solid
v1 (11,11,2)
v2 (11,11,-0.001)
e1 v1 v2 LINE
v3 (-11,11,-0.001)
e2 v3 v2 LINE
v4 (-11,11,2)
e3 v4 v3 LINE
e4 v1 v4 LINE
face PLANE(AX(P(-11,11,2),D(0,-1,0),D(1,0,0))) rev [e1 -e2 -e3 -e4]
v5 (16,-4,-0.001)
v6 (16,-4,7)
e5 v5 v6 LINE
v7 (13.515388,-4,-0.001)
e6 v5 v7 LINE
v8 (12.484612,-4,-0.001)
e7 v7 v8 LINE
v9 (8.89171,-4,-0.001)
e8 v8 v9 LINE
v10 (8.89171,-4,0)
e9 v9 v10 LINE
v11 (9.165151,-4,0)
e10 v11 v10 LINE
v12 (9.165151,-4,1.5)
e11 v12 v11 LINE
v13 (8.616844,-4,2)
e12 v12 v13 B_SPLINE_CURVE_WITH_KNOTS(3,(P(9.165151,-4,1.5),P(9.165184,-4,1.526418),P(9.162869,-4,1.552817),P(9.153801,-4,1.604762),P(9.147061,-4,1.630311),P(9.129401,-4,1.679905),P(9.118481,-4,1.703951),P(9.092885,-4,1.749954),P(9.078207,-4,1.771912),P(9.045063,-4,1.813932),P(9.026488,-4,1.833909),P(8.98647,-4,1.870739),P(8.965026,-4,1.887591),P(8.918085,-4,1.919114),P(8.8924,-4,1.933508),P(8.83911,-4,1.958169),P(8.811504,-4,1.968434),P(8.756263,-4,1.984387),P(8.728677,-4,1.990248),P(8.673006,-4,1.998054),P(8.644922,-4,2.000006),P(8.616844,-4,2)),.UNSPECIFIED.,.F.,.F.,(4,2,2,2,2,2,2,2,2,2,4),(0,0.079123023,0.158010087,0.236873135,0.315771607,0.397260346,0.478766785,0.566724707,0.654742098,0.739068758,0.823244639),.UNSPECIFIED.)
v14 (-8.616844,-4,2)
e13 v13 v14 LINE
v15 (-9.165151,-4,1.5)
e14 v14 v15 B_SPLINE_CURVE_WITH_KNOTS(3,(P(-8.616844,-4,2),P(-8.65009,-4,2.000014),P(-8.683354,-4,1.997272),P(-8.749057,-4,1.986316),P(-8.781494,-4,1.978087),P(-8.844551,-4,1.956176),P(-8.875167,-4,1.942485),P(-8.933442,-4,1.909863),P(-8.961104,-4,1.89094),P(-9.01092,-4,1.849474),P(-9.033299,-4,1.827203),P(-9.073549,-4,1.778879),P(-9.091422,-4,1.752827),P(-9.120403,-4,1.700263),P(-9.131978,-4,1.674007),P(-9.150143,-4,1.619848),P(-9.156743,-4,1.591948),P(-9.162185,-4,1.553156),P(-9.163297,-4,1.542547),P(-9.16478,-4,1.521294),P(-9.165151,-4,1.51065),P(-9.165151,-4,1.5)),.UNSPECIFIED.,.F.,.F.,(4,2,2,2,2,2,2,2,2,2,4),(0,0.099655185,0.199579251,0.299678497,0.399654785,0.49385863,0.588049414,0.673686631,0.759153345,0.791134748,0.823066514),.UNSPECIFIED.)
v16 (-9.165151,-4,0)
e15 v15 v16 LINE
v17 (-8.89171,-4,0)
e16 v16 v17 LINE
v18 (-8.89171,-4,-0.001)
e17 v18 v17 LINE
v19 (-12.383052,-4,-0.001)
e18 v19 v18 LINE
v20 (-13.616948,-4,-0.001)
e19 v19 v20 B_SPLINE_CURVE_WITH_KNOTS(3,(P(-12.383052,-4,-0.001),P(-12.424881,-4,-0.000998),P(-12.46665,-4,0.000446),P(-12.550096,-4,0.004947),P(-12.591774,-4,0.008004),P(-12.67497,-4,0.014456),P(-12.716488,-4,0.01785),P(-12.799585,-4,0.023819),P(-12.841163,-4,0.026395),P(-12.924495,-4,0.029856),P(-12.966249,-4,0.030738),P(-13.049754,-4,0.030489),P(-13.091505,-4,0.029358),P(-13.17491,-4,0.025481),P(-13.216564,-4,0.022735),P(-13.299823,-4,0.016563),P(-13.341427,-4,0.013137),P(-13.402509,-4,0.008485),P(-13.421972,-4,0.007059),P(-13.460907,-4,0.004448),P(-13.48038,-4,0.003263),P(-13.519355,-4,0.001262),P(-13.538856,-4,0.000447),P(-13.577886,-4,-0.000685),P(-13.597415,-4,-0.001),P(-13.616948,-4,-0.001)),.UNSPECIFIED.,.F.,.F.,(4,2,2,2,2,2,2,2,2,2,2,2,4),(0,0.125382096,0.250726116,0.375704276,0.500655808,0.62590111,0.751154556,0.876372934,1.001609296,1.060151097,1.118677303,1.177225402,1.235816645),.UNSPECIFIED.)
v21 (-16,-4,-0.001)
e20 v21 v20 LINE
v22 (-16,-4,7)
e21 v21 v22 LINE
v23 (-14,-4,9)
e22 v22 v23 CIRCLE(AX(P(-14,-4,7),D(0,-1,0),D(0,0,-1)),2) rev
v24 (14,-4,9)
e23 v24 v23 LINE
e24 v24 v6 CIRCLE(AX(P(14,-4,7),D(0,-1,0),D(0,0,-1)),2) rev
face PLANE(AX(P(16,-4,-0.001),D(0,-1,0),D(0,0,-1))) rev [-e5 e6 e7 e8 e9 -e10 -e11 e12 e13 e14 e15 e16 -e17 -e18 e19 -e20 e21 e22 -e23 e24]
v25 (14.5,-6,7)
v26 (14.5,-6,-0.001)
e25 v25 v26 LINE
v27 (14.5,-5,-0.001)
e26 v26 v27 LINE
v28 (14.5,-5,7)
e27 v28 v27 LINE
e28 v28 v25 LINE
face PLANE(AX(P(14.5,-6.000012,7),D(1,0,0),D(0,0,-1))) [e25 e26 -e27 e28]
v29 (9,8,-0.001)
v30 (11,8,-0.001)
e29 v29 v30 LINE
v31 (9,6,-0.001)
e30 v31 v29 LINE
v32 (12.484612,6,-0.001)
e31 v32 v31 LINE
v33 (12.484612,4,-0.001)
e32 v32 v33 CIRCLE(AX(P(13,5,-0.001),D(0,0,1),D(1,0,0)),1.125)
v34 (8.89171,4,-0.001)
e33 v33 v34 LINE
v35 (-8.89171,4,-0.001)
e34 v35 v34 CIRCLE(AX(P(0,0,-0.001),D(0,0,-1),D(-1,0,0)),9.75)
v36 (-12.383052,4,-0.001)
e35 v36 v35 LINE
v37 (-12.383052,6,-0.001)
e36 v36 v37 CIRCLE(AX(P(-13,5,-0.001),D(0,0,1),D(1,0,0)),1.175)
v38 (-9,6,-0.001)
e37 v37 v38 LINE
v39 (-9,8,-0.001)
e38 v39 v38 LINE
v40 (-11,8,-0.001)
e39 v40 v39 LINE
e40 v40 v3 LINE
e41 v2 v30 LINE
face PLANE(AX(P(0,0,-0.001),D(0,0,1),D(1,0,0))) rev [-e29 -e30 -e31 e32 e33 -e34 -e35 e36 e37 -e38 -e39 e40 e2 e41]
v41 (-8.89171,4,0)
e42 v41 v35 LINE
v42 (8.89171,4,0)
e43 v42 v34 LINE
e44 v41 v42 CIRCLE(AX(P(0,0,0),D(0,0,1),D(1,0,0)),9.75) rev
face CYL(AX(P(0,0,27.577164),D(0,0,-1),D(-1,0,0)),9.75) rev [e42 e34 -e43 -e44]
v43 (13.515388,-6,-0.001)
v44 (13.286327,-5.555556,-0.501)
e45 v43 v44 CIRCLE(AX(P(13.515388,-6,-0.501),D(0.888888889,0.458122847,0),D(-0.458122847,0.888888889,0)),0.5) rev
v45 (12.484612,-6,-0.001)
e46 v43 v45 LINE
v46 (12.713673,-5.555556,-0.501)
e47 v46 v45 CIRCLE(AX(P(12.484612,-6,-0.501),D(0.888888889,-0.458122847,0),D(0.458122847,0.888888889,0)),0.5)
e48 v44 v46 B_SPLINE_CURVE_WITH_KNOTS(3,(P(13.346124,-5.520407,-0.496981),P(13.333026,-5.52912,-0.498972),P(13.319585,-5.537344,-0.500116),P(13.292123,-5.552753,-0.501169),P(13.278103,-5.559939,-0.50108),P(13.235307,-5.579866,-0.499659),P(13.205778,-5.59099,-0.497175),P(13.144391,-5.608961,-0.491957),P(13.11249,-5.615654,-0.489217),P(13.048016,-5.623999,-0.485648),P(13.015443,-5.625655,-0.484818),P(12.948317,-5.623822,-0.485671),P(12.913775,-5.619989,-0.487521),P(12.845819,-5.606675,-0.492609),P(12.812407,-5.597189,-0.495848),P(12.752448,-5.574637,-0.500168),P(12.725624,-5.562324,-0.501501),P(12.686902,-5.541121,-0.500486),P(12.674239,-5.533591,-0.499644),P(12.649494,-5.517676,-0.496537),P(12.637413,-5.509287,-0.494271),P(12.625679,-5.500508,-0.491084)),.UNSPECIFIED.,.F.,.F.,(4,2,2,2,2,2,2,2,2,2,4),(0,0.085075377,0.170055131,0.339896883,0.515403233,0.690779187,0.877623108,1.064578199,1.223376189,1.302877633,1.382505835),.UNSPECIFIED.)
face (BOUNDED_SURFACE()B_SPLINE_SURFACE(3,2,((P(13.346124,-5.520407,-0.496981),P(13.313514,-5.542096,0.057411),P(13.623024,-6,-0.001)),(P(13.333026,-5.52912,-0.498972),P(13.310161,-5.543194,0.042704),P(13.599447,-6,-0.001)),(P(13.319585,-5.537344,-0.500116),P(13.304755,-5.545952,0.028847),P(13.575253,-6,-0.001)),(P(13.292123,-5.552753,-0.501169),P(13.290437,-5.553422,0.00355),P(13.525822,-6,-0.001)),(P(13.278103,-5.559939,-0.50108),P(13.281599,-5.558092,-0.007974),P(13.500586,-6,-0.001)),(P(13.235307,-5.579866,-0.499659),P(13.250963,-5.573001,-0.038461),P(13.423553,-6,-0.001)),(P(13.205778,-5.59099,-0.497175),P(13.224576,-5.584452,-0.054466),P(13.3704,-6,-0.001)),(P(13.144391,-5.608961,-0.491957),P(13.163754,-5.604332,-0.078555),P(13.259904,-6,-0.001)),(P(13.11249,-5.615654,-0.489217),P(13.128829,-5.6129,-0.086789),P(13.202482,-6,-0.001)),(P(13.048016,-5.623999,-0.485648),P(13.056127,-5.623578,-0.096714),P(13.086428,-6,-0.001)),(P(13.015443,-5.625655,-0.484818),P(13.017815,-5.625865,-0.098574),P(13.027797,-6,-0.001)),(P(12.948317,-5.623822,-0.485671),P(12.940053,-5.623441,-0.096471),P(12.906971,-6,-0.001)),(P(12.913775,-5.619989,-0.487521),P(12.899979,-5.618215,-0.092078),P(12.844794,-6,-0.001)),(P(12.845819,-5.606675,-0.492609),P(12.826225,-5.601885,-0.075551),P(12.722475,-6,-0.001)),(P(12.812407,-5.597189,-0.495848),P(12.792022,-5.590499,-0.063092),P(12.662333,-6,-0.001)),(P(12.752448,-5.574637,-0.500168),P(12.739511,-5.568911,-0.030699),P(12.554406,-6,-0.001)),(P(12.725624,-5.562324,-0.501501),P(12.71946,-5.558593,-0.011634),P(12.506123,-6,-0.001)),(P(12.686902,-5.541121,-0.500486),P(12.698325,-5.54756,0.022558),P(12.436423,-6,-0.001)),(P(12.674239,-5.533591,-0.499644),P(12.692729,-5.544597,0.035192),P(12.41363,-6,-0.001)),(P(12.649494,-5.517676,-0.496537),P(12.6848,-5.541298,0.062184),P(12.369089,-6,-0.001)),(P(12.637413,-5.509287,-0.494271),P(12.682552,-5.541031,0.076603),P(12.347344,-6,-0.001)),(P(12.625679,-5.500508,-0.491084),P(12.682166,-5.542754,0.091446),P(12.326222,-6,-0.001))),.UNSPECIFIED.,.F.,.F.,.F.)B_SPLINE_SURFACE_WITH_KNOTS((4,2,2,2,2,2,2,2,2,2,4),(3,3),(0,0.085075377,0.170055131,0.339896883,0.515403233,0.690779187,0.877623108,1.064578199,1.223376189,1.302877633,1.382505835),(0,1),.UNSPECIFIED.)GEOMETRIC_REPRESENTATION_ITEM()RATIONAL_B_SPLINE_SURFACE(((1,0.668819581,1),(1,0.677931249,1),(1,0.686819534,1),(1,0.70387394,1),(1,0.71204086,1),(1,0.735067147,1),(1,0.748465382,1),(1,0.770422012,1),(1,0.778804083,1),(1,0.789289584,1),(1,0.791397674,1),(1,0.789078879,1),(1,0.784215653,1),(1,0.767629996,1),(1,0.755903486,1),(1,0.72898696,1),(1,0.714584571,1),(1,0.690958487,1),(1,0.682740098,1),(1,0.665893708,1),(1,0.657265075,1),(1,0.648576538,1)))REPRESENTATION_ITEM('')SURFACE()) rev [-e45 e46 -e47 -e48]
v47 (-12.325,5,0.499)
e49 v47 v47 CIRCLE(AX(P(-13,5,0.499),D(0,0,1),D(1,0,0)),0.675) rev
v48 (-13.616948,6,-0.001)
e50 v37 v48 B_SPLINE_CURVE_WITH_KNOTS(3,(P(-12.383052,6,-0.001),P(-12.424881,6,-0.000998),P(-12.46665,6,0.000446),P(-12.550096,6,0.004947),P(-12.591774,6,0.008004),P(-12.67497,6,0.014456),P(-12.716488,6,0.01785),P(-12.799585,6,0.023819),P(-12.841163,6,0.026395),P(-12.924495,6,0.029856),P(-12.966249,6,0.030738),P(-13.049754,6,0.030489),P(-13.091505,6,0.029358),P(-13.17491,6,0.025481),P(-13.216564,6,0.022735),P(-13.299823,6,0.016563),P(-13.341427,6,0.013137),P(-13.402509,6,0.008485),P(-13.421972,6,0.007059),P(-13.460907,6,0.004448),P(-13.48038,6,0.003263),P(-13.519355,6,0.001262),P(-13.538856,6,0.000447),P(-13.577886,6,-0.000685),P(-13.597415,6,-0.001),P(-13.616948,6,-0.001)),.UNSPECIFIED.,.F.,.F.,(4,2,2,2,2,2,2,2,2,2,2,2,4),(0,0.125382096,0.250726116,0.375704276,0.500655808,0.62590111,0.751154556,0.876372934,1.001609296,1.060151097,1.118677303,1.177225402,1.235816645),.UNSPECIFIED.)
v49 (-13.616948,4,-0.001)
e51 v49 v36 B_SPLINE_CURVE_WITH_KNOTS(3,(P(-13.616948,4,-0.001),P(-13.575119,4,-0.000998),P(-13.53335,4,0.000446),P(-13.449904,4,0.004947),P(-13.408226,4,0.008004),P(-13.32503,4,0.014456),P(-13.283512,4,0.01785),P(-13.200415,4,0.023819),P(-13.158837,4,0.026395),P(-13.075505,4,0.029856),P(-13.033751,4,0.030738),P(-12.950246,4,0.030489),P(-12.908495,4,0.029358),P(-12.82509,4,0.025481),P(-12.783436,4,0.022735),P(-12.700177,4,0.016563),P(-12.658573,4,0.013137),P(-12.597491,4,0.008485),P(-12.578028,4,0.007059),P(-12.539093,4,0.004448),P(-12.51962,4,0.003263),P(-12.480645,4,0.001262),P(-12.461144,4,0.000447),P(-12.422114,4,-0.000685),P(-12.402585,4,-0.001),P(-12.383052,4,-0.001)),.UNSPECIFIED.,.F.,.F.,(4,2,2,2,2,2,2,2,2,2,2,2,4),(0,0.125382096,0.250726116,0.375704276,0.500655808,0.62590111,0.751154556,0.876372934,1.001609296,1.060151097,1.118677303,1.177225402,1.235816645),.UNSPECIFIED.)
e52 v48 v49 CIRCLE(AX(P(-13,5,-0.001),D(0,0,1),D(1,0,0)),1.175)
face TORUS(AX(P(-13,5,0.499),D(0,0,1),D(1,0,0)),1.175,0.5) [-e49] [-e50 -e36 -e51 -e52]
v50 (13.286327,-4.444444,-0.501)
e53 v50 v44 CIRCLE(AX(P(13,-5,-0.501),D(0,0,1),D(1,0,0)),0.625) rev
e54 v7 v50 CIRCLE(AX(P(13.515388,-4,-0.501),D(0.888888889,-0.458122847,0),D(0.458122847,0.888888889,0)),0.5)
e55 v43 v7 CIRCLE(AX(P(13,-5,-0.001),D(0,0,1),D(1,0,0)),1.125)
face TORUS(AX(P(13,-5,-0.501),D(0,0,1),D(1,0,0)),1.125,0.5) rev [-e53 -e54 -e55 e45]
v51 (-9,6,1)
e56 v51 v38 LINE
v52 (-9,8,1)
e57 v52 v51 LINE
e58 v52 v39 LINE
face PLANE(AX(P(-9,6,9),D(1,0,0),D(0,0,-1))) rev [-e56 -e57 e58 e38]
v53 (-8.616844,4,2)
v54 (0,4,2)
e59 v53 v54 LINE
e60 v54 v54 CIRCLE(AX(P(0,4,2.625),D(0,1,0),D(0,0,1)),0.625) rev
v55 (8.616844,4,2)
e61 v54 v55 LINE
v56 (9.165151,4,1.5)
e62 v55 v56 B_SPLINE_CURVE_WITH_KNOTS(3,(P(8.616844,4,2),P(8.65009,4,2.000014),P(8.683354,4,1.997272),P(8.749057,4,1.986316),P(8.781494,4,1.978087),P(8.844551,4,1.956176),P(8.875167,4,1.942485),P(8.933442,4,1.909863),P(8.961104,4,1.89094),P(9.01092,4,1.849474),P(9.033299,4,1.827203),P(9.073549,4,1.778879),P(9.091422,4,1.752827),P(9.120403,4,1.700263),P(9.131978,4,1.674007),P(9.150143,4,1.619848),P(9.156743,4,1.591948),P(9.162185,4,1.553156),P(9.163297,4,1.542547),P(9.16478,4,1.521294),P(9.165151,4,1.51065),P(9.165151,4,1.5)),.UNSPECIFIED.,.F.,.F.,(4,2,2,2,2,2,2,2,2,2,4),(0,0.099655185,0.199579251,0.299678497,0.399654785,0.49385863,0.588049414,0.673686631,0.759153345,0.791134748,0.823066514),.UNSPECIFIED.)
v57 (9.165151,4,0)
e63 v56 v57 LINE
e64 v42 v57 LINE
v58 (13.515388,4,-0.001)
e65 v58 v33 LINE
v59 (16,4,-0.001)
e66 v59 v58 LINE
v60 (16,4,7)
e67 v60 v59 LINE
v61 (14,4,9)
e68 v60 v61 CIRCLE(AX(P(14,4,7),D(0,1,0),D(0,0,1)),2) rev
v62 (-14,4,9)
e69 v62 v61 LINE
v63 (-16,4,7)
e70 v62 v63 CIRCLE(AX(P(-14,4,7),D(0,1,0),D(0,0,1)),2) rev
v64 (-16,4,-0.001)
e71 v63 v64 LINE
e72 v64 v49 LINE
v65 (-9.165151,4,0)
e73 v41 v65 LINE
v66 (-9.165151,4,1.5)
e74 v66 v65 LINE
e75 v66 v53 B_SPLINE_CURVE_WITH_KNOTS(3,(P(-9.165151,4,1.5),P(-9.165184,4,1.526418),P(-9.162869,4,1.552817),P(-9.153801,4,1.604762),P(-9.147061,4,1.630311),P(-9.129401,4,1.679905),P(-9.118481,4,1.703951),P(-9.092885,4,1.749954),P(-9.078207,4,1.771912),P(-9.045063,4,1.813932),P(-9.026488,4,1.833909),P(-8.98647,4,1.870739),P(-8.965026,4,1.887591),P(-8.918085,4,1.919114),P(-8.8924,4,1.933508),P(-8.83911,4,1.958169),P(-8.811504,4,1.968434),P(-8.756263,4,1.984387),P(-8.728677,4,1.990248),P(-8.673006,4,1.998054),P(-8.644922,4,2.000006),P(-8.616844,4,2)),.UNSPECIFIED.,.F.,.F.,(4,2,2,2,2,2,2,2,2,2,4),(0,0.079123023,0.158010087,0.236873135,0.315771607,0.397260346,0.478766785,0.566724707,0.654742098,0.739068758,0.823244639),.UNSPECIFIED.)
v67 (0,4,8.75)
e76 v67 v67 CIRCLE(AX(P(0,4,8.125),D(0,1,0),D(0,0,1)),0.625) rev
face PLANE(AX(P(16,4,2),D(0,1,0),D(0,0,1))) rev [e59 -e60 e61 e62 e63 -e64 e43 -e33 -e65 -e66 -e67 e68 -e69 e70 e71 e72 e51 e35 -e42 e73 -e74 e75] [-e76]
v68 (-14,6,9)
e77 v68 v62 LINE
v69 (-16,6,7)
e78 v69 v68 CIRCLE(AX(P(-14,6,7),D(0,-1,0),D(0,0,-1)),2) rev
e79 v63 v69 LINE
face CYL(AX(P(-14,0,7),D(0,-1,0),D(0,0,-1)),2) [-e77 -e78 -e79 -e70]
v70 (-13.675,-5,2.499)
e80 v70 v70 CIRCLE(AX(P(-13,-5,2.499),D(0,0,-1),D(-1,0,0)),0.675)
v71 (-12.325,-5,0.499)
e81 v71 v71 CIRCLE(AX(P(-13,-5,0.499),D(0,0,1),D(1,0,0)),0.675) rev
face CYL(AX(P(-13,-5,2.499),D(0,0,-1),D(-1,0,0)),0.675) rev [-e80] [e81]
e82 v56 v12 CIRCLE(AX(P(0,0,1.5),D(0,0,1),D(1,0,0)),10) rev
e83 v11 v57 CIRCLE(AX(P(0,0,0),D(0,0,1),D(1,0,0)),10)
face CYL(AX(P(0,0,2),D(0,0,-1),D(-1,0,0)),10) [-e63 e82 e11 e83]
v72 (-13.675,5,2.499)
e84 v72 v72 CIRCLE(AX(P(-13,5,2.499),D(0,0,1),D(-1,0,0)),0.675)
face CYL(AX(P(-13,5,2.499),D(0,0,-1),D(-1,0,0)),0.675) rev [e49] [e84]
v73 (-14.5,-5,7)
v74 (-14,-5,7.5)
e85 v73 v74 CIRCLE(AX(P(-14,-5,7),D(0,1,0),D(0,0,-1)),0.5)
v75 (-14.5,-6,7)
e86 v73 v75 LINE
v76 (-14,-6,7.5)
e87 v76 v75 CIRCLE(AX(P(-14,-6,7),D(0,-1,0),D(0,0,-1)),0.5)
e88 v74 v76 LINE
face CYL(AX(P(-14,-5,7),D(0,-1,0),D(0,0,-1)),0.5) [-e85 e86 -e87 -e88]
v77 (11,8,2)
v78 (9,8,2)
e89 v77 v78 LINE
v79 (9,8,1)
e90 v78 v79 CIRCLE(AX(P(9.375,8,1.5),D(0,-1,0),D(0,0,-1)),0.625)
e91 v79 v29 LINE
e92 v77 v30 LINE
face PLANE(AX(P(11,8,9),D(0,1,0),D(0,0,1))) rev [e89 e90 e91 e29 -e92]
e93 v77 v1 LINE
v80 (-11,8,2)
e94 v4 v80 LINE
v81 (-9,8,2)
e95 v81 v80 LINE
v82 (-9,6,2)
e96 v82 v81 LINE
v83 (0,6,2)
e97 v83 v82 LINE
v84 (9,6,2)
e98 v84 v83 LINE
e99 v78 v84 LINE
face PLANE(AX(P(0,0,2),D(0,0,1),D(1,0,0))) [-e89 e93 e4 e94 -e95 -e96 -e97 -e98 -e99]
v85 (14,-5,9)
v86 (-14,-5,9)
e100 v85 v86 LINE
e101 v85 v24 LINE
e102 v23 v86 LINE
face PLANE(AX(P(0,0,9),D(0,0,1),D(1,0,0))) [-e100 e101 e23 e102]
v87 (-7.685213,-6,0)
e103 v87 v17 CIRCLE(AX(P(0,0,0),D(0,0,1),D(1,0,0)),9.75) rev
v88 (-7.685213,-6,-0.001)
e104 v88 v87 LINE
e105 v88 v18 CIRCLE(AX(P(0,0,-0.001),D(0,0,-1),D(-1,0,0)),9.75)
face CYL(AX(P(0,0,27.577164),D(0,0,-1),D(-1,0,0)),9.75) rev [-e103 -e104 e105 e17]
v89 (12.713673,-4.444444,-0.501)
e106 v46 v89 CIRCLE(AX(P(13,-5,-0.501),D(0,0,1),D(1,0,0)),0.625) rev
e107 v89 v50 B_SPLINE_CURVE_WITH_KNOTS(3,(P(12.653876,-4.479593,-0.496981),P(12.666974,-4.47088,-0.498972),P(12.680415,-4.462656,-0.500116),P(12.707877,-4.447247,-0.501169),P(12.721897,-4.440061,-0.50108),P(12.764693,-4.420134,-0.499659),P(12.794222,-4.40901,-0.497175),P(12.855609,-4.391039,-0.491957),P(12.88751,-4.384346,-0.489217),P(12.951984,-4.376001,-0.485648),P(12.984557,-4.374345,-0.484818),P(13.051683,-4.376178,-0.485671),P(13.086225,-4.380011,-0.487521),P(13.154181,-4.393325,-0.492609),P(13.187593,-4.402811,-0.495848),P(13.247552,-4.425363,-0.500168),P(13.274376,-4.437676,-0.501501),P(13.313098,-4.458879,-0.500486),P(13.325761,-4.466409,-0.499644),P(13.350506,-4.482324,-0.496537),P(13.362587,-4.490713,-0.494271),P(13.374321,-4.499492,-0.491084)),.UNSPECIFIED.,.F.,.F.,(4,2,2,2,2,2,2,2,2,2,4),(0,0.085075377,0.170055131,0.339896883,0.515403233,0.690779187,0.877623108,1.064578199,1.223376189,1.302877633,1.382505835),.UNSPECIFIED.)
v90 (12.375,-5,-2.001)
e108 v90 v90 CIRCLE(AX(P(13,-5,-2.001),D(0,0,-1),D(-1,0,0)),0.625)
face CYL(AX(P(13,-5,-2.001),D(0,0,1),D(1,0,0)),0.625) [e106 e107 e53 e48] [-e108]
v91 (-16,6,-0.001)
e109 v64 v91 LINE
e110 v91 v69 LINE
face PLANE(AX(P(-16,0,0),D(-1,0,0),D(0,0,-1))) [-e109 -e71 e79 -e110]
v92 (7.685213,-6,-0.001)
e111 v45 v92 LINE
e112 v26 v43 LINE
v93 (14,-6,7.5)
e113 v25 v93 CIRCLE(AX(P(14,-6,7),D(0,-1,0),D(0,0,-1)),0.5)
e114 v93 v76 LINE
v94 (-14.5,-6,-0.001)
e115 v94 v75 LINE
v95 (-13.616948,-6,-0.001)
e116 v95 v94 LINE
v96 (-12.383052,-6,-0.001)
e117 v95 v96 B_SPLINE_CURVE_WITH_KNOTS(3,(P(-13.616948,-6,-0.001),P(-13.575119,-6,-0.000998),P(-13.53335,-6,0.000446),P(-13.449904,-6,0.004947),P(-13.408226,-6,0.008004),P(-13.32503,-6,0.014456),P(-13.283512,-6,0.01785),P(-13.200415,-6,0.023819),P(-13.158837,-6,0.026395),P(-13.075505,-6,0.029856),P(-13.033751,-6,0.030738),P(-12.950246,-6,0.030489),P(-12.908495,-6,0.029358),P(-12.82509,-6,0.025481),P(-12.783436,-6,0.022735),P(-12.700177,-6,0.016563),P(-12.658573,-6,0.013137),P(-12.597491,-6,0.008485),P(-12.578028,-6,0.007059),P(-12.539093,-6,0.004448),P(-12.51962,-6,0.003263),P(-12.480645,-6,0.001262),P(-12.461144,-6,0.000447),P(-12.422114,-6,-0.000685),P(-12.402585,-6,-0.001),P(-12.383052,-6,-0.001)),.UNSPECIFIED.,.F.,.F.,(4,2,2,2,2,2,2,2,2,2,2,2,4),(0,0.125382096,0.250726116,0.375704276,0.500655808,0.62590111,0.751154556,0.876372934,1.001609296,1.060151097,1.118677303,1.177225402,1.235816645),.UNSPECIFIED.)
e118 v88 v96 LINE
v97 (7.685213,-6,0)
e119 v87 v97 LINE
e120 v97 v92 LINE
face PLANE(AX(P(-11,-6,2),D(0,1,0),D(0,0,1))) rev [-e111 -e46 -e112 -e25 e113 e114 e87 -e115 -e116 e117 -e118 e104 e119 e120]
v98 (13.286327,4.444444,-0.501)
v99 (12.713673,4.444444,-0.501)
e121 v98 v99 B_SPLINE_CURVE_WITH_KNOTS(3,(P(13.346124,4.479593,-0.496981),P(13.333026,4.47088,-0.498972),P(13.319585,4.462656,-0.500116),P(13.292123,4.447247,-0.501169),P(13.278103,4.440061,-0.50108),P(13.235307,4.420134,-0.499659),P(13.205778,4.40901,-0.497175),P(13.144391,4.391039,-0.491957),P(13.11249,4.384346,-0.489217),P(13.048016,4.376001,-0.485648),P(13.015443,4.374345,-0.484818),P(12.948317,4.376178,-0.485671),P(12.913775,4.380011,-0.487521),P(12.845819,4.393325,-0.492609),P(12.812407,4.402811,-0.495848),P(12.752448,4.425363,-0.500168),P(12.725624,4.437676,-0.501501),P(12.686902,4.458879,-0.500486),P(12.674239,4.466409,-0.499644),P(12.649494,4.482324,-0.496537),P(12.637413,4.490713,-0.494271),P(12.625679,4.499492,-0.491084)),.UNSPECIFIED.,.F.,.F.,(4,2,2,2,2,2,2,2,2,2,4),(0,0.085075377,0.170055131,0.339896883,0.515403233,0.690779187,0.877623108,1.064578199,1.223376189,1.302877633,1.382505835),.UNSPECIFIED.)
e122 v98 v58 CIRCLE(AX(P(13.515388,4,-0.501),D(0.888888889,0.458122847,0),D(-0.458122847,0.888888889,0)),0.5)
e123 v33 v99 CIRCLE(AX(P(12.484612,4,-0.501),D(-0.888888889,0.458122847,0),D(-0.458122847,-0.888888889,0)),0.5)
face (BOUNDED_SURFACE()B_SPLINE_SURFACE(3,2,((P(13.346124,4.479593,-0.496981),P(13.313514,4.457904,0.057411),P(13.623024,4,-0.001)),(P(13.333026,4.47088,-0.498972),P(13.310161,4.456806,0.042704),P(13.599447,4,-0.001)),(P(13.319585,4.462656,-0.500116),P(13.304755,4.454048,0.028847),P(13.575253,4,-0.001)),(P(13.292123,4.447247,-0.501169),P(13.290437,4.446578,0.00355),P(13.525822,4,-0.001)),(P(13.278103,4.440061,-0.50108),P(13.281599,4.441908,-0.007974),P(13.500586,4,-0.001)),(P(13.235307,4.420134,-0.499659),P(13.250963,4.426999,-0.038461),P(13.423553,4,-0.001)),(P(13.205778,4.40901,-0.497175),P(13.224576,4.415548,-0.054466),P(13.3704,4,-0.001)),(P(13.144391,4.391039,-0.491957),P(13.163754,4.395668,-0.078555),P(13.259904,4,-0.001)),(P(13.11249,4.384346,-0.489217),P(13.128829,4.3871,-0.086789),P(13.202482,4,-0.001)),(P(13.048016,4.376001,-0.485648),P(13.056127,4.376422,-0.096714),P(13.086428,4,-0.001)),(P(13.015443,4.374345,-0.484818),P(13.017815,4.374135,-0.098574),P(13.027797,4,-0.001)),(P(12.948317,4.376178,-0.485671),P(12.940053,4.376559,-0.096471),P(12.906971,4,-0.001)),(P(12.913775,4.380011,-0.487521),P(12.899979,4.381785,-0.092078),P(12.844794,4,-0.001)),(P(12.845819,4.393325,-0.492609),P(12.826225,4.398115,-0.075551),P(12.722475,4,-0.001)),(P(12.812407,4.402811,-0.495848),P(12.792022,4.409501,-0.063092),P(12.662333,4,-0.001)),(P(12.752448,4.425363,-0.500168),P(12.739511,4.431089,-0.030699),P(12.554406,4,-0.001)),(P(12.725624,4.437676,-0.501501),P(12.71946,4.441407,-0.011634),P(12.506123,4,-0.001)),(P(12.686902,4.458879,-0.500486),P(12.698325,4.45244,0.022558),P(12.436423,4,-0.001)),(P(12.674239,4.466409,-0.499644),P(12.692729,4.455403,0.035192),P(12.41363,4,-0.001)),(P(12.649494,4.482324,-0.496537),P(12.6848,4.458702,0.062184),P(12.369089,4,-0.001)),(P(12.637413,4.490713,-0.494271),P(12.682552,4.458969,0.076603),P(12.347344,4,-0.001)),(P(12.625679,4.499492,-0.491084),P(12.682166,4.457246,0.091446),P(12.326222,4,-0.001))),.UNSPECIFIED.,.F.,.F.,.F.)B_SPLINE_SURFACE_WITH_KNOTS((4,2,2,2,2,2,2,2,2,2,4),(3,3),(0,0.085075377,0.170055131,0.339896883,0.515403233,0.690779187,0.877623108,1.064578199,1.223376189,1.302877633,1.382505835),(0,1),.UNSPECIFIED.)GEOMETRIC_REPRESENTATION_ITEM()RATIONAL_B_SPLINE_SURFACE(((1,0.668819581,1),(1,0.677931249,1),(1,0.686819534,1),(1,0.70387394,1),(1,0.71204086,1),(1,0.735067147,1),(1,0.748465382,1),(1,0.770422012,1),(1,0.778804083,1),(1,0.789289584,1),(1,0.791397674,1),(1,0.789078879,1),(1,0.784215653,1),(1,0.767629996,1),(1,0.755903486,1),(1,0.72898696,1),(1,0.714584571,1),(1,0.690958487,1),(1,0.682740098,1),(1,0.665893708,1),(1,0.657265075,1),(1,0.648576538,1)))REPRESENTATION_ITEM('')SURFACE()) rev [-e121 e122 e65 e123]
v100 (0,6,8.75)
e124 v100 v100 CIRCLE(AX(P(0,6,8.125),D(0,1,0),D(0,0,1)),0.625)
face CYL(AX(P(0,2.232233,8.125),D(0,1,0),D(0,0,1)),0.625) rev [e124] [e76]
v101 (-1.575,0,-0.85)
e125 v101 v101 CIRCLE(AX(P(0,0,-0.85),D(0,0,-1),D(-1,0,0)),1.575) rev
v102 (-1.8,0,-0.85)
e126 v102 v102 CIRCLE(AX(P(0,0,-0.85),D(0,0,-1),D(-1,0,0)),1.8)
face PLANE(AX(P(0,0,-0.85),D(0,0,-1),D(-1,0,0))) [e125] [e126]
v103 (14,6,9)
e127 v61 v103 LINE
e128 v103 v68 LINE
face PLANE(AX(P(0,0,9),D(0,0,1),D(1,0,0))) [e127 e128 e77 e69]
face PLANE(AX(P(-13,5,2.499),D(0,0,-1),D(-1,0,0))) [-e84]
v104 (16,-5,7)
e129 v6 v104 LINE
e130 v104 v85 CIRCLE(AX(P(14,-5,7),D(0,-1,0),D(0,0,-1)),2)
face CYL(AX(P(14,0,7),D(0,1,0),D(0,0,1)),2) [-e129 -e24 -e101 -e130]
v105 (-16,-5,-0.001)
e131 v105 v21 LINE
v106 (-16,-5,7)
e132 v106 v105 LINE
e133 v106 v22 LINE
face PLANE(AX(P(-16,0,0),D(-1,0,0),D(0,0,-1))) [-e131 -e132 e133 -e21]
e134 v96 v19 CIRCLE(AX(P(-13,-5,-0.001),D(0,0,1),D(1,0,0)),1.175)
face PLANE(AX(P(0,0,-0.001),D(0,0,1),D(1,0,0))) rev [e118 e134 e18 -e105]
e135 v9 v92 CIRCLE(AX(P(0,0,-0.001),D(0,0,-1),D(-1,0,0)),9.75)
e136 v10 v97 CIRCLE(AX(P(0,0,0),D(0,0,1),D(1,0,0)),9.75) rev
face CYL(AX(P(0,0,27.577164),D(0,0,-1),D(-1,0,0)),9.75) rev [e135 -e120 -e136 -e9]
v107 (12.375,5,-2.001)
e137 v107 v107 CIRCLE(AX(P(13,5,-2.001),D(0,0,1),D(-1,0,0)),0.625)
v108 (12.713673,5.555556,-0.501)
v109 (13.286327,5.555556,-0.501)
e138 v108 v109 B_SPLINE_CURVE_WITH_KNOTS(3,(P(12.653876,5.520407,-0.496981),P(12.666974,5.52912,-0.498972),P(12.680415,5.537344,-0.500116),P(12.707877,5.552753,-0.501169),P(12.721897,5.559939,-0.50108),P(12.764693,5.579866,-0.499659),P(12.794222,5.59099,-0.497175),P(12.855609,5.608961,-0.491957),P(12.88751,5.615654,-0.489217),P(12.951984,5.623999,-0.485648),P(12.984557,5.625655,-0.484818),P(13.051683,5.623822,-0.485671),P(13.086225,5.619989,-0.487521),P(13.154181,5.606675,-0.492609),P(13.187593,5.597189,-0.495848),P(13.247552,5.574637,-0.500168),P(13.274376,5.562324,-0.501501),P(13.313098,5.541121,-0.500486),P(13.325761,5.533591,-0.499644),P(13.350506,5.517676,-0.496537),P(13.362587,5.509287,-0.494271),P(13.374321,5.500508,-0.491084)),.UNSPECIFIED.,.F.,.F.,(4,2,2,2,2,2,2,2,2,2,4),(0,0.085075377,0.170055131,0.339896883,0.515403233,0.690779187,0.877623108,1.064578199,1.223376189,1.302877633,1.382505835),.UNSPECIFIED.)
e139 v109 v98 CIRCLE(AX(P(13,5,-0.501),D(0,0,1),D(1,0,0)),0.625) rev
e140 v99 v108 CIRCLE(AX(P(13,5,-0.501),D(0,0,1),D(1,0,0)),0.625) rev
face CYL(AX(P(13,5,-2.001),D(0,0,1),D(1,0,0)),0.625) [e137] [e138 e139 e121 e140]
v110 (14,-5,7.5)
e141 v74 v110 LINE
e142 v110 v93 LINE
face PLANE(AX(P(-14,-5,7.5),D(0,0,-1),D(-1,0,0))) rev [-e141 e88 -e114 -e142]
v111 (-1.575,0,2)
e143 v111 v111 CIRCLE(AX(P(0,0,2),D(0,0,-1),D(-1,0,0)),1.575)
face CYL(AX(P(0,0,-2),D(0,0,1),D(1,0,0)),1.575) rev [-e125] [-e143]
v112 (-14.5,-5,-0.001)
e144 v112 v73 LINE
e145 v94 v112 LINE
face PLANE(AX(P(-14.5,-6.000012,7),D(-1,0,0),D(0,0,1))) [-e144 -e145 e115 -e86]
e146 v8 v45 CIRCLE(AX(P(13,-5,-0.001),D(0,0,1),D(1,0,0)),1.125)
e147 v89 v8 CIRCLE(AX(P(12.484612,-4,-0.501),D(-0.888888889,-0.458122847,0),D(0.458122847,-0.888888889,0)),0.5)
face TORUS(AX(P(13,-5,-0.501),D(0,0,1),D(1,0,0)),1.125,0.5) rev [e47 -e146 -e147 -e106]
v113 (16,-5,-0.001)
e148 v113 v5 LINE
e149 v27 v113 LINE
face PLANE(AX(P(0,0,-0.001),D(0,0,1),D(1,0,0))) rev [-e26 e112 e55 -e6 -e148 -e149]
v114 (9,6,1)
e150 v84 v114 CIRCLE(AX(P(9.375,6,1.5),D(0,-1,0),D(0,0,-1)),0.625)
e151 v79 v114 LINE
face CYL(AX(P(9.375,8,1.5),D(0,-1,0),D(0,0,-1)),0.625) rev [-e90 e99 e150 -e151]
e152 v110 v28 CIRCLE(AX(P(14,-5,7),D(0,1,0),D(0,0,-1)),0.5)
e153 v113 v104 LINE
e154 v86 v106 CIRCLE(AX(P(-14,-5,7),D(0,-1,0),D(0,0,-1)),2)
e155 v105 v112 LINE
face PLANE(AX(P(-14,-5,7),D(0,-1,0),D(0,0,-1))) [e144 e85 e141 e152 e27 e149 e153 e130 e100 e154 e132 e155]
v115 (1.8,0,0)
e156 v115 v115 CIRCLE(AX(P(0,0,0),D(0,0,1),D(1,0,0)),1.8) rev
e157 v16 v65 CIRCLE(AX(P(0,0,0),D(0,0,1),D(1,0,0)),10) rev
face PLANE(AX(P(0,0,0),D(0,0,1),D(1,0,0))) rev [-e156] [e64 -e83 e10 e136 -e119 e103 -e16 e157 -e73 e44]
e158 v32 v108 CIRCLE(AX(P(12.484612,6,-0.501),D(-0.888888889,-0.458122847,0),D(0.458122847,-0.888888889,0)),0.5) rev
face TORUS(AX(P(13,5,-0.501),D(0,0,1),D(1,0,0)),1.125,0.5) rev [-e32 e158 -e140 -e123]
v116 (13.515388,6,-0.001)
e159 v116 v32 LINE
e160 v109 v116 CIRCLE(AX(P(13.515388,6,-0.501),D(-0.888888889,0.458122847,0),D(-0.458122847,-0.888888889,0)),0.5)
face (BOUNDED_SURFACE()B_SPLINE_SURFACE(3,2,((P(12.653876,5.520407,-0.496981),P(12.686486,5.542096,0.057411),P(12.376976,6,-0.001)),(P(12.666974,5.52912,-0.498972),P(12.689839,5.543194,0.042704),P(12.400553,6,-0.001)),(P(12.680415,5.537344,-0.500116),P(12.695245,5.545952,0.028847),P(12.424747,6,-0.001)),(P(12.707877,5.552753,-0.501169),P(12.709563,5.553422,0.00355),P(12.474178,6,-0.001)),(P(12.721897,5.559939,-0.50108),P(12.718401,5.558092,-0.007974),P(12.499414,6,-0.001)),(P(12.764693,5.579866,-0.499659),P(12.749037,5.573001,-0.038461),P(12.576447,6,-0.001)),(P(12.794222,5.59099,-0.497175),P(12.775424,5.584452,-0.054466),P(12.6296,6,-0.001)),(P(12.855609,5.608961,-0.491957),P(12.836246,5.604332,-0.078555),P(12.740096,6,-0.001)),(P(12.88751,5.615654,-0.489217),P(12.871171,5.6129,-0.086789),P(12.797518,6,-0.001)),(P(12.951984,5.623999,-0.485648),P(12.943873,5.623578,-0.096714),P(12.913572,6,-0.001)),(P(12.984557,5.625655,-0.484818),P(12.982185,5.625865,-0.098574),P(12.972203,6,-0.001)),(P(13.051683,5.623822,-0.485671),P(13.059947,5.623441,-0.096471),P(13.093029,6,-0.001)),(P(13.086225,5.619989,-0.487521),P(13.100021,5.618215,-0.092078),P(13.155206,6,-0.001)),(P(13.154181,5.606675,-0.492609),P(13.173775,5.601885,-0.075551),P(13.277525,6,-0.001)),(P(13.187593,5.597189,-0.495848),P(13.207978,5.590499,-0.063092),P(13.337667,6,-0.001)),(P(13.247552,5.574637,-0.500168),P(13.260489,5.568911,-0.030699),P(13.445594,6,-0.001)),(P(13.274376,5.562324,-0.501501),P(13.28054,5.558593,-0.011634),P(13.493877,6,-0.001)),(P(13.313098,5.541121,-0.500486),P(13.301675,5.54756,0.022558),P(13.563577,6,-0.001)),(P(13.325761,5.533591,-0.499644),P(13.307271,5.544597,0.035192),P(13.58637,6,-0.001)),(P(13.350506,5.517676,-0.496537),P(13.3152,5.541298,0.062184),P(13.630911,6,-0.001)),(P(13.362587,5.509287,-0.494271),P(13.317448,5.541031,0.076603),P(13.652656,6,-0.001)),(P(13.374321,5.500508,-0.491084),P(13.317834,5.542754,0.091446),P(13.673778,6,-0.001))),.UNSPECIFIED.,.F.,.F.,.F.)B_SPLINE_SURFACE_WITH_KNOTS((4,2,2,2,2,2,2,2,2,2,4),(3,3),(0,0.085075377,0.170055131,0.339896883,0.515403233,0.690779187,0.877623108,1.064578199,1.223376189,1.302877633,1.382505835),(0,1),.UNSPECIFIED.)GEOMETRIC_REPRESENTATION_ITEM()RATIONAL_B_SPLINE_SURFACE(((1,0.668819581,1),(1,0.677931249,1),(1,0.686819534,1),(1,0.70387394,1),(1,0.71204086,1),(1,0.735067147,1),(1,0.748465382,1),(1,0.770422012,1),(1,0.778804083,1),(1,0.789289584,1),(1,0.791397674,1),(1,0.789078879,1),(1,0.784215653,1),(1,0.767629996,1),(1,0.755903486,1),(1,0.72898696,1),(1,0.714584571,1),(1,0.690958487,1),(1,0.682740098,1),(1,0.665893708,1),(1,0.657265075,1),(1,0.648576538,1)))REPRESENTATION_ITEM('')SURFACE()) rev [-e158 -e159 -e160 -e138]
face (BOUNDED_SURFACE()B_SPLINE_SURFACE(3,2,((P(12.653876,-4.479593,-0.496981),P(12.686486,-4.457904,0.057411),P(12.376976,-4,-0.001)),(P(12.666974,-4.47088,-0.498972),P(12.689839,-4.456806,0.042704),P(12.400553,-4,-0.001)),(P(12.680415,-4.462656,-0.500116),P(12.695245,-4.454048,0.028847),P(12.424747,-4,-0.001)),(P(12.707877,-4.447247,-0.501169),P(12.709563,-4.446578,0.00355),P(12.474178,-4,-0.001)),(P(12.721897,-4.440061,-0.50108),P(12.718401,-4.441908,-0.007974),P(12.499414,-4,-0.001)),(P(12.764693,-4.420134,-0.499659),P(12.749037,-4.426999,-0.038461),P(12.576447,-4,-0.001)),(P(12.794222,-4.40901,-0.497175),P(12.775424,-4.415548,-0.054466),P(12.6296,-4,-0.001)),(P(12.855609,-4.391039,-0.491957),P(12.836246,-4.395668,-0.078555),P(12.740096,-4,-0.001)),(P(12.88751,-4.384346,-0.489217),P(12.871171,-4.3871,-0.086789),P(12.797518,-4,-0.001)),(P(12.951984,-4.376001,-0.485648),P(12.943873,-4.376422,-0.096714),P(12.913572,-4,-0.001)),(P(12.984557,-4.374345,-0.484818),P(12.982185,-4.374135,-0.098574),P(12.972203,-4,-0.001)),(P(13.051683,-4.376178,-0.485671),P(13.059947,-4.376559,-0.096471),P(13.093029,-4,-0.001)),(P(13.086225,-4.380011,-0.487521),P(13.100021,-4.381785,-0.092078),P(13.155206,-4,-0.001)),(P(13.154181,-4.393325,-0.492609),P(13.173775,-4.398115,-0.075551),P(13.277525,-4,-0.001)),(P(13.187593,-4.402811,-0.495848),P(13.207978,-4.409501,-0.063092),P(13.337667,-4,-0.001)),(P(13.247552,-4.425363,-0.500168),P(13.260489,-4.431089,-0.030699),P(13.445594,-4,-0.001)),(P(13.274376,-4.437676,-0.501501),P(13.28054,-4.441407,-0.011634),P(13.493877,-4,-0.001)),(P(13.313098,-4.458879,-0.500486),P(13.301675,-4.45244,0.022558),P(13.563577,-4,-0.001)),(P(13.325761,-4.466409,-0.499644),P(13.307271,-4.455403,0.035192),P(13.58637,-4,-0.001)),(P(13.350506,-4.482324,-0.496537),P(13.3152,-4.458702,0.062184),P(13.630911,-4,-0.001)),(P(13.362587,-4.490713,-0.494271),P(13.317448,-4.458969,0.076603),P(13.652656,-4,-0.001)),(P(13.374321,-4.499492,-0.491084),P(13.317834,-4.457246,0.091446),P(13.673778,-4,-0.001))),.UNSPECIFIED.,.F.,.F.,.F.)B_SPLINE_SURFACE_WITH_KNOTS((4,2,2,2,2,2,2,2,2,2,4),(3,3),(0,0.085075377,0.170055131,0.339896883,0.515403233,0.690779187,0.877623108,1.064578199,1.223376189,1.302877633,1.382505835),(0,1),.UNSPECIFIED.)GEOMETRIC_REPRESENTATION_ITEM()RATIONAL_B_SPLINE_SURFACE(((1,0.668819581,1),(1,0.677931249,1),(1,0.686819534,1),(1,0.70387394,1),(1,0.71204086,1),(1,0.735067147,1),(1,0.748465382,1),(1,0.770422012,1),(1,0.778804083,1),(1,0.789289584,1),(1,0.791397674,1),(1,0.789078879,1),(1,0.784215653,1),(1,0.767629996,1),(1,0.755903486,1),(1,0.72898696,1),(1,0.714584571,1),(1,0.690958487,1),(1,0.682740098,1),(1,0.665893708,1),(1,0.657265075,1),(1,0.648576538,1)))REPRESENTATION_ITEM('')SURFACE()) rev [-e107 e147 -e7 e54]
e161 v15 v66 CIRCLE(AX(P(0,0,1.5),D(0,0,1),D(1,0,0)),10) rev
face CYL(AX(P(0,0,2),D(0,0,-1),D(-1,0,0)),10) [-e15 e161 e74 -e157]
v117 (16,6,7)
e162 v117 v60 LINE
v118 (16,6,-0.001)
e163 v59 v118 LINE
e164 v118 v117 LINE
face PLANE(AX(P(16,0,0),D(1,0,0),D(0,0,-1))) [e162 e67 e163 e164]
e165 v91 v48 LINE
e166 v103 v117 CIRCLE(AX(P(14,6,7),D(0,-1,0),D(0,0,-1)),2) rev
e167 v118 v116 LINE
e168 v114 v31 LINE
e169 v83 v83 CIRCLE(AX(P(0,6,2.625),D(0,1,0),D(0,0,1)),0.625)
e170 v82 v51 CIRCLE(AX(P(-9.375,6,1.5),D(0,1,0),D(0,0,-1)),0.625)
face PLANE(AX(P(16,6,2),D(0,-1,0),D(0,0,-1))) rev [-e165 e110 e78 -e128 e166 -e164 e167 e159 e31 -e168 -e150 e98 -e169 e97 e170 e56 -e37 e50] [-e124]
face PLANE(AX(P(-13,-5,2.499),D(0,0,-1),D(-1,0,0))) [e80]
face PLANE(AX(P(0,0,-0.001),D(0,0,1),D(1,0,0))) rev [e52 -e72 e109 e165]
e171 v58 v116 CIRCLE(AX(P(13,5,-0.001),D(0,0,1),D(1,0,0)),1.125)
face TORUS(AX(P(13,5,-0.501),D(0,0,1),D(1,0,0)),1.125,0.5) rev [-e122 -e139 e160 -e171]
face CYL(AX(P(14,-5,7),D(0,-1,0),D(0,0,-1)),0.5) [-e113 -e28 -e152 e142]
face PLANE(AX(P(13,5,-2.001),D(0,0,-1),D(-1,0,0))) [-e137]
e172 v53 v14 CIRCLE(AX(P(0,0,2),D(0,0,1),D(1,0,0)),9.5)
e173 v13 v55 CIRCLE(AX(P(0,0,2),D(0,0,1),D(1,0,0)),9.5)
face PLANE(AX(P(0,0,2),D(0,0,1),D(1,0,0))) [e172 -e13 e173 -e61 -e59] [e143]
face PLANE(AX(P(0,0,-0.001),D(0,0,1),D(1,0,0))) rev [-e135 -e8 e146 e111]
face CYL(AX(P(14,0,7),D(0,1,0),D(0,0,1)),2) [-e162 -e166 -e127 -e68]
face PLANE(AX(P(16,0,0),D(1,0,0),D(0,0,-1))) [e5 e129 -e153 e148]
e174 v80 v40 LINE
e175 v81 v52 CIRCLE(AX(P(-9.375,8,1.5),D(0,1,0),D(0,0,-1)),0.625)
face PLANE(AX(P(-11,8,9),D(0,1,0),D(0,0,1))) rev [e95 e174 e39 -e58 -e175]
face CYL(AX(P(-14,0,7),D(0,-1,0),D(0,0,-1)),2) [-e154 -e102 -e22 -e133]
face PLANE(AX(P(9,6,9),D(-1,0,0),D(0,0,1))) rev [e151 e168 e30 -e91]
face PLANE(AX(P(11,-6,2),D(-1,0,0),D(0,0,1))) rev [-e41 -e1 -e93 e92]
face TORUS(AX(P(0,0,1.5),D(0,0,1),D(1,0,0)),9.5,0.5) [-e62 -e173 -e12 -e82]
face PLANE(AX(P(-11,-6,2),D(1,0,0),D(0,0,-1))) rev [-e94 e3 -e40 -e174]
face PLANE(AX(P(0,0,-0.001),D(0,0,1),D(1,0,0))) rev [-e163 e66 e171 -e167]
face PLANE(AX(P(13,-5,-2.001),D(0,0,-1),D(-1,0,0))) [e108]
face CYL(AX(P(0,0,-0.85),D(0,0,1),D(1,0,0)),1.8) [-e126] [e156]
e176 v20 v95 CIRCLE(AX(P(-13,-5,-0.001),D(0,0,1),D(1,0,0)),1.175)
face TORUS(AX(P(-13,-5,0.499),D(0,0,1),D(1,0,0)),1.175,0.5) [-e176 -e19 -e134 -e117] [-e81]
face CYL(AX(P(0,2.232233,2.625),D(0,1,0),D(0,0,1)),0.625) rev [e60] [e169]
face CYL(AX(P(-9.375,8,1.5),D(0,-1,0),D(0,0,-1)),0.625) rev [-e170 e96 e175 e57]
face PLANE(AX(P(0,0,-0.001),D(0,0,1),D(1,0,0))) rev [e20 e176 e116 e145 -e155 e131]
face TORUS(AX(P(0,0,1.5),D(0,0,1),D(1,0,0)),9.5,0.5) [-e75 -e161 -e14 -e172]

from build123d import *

# Parameters (mm, degrees)
BOSS_EXTRUDE1_DEPTH     = 2
SKETCH2_R               = 1.575
BOSS_EXTRUDE2_DEPTH     = 4
SKETCH3_R               = 1.8
BOSS_EXTRUDE3_DEPTH     = 0.85
SKETCH4_W               = 2
SKETCH4_H               = 17
BOSS_EXTRUDE4_DEPTH     = 0.001
SKETCH5_W               = 18
SKETCH5_H               = 2
BOSS_EXTRUDE5_DEPTH     = 0.001
SKETCH6_W               = 2.001
SKETCH6_H               = 2
BOSS_EXTRUDE6_DEPTH     = 5
BOSS_EXTRUDE7_DEPTH     = 0.001
CUT_EXTRUDE1_DEPTH      = 20.519323784
SKETCH9_W               = 2.937742252
SKETCH9_H               = 8
CUT_EXTRUDE2_DEPTH      = 0.001
CUT_EXTRUDE11_START     = -0.001
SKETCH21_R              = 9.75
SKETCH21_R_2            = 1.8
CUT_EXTRUDE11_DEPTH     = 0.001
SKETCH10_W              = 32
SKETCH10_H              = 2
BOSS_EXTRUDE8_DEPTH     = 7
FILLET1_R               = 0.5
SKETCH11_R              = 0.625
BOSS_EXTRUDE9_DEPTH     = 2
SKETCH14_W              = 2
SKETCH14_H              = 2
CUT_EXTRUDE5_DEPTH      = 22.401355237
SKETCH12_R              = 0.675
CUT_EXTRUDE3_DEPTH      = 2.5
CUT_EXTRUDE6_DEPTH      = 2
FILLET2_R               = 0.5
FILLET3_R               = 0.5
FILLET4_R               = 2
CUT_EXTRUDE7_DEPTH      = 26.019992106
CUT_EXTRUDE7_DEPTH_BACK = 1
SKETCH19_R              = 0.625
CUT_EXTRUDE9_DEPTH      = 2


with BuildPart() as part:
    # Sketch1 → Boss-Extrude1 (new body)
    with BuildSketch(Plane.XY):
        Polygon((-11, 6), (-11, 11), (11, 11), (11, 6), (11, -6), (-11, -6), align=None)
    extrude(amount=BOSS_EXTRUDE1_DEPTH)

    # Sketch3 → Boss-Extrude3 (add)
    with BuildSketch(Plane(origin=(0, 0, 0), x_dir=(-1, 0, 0), z_dir=(0, 0, -1))):
        with Locations(Location((0, 0, 0), (0, 0, 180))):
            Circle(SKETCH3_R)
    extrude(amount=BOSS_EXTRUDE3_DEPTH)

    # Sketch4 → Boss-Extrude4 (add)
    with BuildSketch(Plane(origin=(0, 0, 0), x_dir=(-1, 0, 0), z_dir=(0, 0, -1))):
        with Locations((10, 2.5)):
            Rectangle(SKETCH4_W, SKETCH4_H)
        with Locations((-10, 2.5)):
            Rectangle(SKETCH4_W, SKETCH4_H)
    extrude(amount=BOSS_EXTRUDE4_DEPTH)

    # Sketch5 → Boss-Extrude5 (add)
    with BuildSketch(Plane(origin=(0, 0, 0), x_dir=(-1, 0, 0), z_dir=(0, 0, -1))):
        with Locations((0, 10)):
            Rectangle(SKETCH5_W, SKETCH5_H)
    extrude(amount=BOSS_EXTRUDE5_DEPTH)

    # Sketch6 → Boss-Extrude6 (add)
    with BuildSketch(Plane(origin=(11, 0, 0), x_dir=(0, 0, -1), z_dir=(1, 0, 0))):
        with Locations((-0.9995, -5)):
            Rectangle(SKETCH6_W, SKETCH6_H)
        with Locations((-0.9995, 5)):
            Rectangle(SKETCH6_W, SKETCH6_H)
    boss_extrude6 = extrude(amount=BOSS_EXTRUDE6_DEPTH)

    # Mirror1: Boss-Extrude6 across plane
    add(boss_extrude6.mirror(Plane(origin=(0, 0, 0), x_dir=(0, 0, 1), z_dir=(1, 0, 0))))

    # Sketch7 → Boss-Extrude7 (add)
    with BuildSketch(Plane(origin=(0, 0, -0.001), x_dir=(-1, 0, 0), z_dir=(0, 0, -1))):
        with BuildLine():
            ThreePointArc((-6.708203932, -6), (-8.407551231, -3.211398808), (-9, 0))
            Line((-9, 0), (-9, -6))
            Line((-9, -6), (-6.708203932, -6))
        make_face()
        with BuildLine():
            Line((-9, 9), (-9, 0))
            ThreePointArc((-9, 0), (-6.363961031, 6.363961031), (0, 9))
            Line((0, 9), (-9, 9))
        make_face()
    boss_extrude7 = extrude(amount=-BOSS_EXTRUDE7_DEPTH)

    # Sketch8 → Cut-Extrude1 (cut, through all)
    with BuildSketch(Plane(origin=(0, 0, -0.001), x_dir=(-1, 0, 0), z_dir=(0, 0, -1))):
        with BuildLine():
            Line((-11, 4), (-9.16515139, 4))
            ThreePointArc((-9.16515139, 4), (-10, 0), (-9.16515139, -4))
            Line((-9.16515139, -4), (-11, -4))
            Line((-11, -4), (-11, 4))
        make_face()
    cut_extrude1 = extrude(amount=-CUT_EXTRUDE1_DEPTH, mode=Mode.SUBTRACT)

    # Sketch9 → Cut-Extrude2 (cut)
    with BuildSketch(Plane(origin=(0, 0, -0.001), x_dir=(-1, 0, 0), z_dir=(0, 0, -1))):
        with Locations((-9.531128874, 0)):
            Rectangle(SKETCH9_W, SKETCH9_H)
    cut_extrude2 = extrude(amount=-CUT_EXTRUDE2_DEPTH, mode=Mode.SUBTRACT)

    # Mirror2: Boss-Extrude7, Cut-Extrude1, Cut-Extrude2 across plane
    add(boss_extrude7.mirror(Plane(origin=(0, 0, 0), x_dir=(0, 0, 1), z_dir=(1, 0, 0))))
    add(cut_extrude1.mirror(Plane(origin=(0, 0, 0), x_dir=(0, 0, 1), z_dir=(1, 0, 0))), mode=Mode.SUBTRACT)
    add(cut_extrude2.mirror(Plane(origin=(0, 0, 0), x_dir=(0, 0, 1), z_dir=(1, 0, 0))), mode=Mode.SUBTRACT)

    # Sketch21 → Cut-Extrude11 (cut)
    with BuildSketch(Plane(origin=(0, 0, -0.001), x_dir=(-1, 0, 0), z_dir=(0, 0, -1)).offset(CUT_EXTRUDE11_START)):
        Circle(SKETCH21_R)
        with Locations(Location((0, 0, 0), (0, 0, 180))):
            Circle(SKETCH21_R_2, mode=Mode.SUBTRACT)
    extrude(amount=CUT_EXTRUDE11_DEPTH, mode=Mode.SUBTRACT)

    # Sketch10 → Boss-Extrude8 (add)
    with BuildSketch(Plane.XY.offset(2)):
        with Locations((0, -5)):
            Rectangle(SKETCH10_W, SKETCH10_H)
        with Locations((0, 5)):
            Rectangle(SKETCH10_W, SKETCH10_H)
    extrude(amount=BOSS_EXTRUDE8_DEPTH)

    # Fillet1
    fillet1_edges = [part.edges().sort_by_distance(p)[0] for p in [
        (10, 0, 2),
        (-10, 0, 2),
    ]]
    fillet(fillet1_edges, radius=FILLET1_R)

    # Sketch11 → Boss-Extrude9 (add)
    with BuildSketch(Plane(origin=(0, 0, -0.001), x_dir=(-1, 0, 0), z_dir=(0, 0, -1))):
        with Locations(Location((-13, -5, 0), (0, 0, 180))):
            Circle(SKETCH11_R)
    boss_extrude9 = extrude(amount=BOSS_EXTRUDE9_DEPTH)

    # Sketch14 → Cut-Extrude5 (cut, through all)
    with BuildSketch(Plane(origin=(0, 0, -0.001), x_dir=(-1, 0, 0), z_dir=(0, 0, -1))):
        with Locations((10, 7)):
            Rectangle(SKETCH14_W, SKETCH14_H)
        with Locations((-10, 7)):
            Rectangle(SKETCH14_W, SKETCH14_H)
    extrude(amount=-CUT_EXTRUDE5_DEPTH, mode=Mode.SUBTRACT)

    # Sketch12 → Cut-Extrude3 (cut)
    with BuildSketch(Plane(origin=(0, 0, -0.001), x_dir=(-1, 0, 0), z_dir=(0, 0, -1))):
        with Locations((13, -5)):
            Circle(SKETCH12_R)
    cut_extrude3 = extrude(amount=-CUT_EXTRUDE3_DEPTH, mode=Mode.SUBTRACT)

    # Sketch16 → Cut-Extrude6 (cut)
    with BuildSketch(Plane(origin=(0, 6, 0), x_dir=(1, 0, 0), z_dir=(0, 1, 0))):
        with BuildLine():
            Line((-9, -1), (-9, -2))
            ThreePointArc((-9, -2), (-8.75, -1.5), (-9, -1))
        make_face()
    cut_extrude6 = extrude(amount=CUT_EXTRUDE6_DEPTH, mode=Mode.SUBTRACT)

    # Mirror3: Boss-Extrude9, Cut-Extrude3 across plane
    add(boss_extrude9.mirror(Plane.ZX))
    add(cut_extrude3.mirror(Plane.ZX), mode=Mode.SUBTRACT)

    # Mirror4: Cut-Extrude6 across plane
    add(cut_extrude6.mirror(Plane(origin=(0, 0, 0), x_dir=(0, 0, 1), z_dir=(1, 0, 0))), mode=Mode.SUBTRACT)

    # Fillet2
    fillet2_edges = [part.edges().sort_by_distance(p)[0] for p in [
        (12.375, -5, -0.001),
        (12.375, 5, -0.001),
    ]]
    fillet(fillet2_edges, radius=FILLET2_R)

    # Fillet3
    # the kernel refuses this fillet: 0.5 mm, written as the material it takes off along each edge
    with BuildSketch(Plane(origin=(-13, -5, -0.001), x_dir=(-1, 0, 0), z_dir=(0, -1, 0))) as fillet3_piece_1:
        with BuildLine():
            CenterArc((0.675 + FILLET3_R, -FILLET3_R), FILLET3_R, 90, 90)
            Line((0.675, -FILLET3_R), (0.675, 0))
            Line((0.675, 0), (0.675 + FILLET3_R, 0))
        make_face()
    revolve(axis=Axis((-13, -5, -0.001), (0, 0, -1)), mode=Mode.SUBTRACT)
    with BuildSketch(Plane(origin=(-13, 5, -0.001), x_dir=(-1, 0, 0), z_dir=(0, 1, 0))) as fillet3_piece_2:
        with BuildLine():
            CenterArc((0.675 + FILLET3_R, FILLET3_R), FILLET3_R, 180, 90)
            Line((0.675, FILLET3_R), (0.675, 0))
            Line((0.675, 0), (0.675 + FILLET3_R, 0))
        make_face()
    revolve(axis=Axis((-13, 5, -0.001), (0, 0, 1)), mode=Mode.SUBTRACT)

    # Fillet4
    fillet4_edges = [part.edges().sort_by_distance(p)[0] for p in [
        (16, -5, 9),
        (-16, -5, 9),
        (-16, 5, 9),
        (16, 5, 9),
    ]]
    fillet(fillet4_edges, radius=FILLET4_R)

    # Sketch17 → Cut-Extrude7 (cut, two sides: drawn at the far end of the back side and taken through both)
    with BuildSketch(Plane.XZ.offset(6).offset(-CUT_EXTRUDE7_DEPTH_BACK)):
        with BuildLine():
            Line((-16, 7), (-16, -0.001))
            Line((-16, -0.001), (-14.5, -0.001))
            Line((-14.5, -0.001), (-14.5, 7))
            ThreePointArc((-14.5, 7), (-14.353553391, 7.353553391), (-14, 7.5))
            Line((-14, 7.5), (14, 7.5))
            ThreePointArc((14, 7.5), (14.353553391, 7.353553391), (14.5, 7))
            Line((14.5, 7), (14.5, -0.001))
            Line((14.5, -0.001), (16, -0.001))
            Line((16, -0.001), (16, 7))
            ThreePointArc((16, 7), (15.414213562, 8.414213562), (14, 9))
            Line((14, 9), (-14, 9))
            ThreePointArc((-14, 9), (-15.414213562, 8.414213562), (-16, 7))
        make_face()
    extrude(amount=CUT_EXTRUDE7_DEPTH + CUT_EXTRUDE7_DEPTH_BACK, mode=Mode.SUBTRACT)

    # Sketch19 → Cut-Extrude9 (cut)
    with BuildSketch(Plane(origin=(0, 6, 0), x_dir=(1, 0, 0), z_dir=(0, 1, 0))):
        with Locations(Location((0, -2.625, 0), (0, 0, 90))):
            Circle(SKETCH19_R)
        with Locations(Location((0, -8.125, 0), (0, 0, 270))):
            Circle(SKETCH19_R)
    extrude(amount=-CUT_EXTRUDE9_DEPTH, mode=Mode.SUBTRACT)


with BuildPart() as body_2:
    # Sketch2 → Boss-Extrude2 (new body)
    with BuildSketch(Plane(origin=(0, 0, 2), x_dir=(-1, 0, 0), z_dir=(0, 0, -1))):
        Circle(SKETCH2_R)
    extrude(amount=BOSS_EXTRUDE2_DEPTH)


with BuildPart() as part_1:
    add(part.part)

    # Combine2: cut body 2
    add(body_2.part, mode=Mode.SUBTRACT)


solid = part_1.part
